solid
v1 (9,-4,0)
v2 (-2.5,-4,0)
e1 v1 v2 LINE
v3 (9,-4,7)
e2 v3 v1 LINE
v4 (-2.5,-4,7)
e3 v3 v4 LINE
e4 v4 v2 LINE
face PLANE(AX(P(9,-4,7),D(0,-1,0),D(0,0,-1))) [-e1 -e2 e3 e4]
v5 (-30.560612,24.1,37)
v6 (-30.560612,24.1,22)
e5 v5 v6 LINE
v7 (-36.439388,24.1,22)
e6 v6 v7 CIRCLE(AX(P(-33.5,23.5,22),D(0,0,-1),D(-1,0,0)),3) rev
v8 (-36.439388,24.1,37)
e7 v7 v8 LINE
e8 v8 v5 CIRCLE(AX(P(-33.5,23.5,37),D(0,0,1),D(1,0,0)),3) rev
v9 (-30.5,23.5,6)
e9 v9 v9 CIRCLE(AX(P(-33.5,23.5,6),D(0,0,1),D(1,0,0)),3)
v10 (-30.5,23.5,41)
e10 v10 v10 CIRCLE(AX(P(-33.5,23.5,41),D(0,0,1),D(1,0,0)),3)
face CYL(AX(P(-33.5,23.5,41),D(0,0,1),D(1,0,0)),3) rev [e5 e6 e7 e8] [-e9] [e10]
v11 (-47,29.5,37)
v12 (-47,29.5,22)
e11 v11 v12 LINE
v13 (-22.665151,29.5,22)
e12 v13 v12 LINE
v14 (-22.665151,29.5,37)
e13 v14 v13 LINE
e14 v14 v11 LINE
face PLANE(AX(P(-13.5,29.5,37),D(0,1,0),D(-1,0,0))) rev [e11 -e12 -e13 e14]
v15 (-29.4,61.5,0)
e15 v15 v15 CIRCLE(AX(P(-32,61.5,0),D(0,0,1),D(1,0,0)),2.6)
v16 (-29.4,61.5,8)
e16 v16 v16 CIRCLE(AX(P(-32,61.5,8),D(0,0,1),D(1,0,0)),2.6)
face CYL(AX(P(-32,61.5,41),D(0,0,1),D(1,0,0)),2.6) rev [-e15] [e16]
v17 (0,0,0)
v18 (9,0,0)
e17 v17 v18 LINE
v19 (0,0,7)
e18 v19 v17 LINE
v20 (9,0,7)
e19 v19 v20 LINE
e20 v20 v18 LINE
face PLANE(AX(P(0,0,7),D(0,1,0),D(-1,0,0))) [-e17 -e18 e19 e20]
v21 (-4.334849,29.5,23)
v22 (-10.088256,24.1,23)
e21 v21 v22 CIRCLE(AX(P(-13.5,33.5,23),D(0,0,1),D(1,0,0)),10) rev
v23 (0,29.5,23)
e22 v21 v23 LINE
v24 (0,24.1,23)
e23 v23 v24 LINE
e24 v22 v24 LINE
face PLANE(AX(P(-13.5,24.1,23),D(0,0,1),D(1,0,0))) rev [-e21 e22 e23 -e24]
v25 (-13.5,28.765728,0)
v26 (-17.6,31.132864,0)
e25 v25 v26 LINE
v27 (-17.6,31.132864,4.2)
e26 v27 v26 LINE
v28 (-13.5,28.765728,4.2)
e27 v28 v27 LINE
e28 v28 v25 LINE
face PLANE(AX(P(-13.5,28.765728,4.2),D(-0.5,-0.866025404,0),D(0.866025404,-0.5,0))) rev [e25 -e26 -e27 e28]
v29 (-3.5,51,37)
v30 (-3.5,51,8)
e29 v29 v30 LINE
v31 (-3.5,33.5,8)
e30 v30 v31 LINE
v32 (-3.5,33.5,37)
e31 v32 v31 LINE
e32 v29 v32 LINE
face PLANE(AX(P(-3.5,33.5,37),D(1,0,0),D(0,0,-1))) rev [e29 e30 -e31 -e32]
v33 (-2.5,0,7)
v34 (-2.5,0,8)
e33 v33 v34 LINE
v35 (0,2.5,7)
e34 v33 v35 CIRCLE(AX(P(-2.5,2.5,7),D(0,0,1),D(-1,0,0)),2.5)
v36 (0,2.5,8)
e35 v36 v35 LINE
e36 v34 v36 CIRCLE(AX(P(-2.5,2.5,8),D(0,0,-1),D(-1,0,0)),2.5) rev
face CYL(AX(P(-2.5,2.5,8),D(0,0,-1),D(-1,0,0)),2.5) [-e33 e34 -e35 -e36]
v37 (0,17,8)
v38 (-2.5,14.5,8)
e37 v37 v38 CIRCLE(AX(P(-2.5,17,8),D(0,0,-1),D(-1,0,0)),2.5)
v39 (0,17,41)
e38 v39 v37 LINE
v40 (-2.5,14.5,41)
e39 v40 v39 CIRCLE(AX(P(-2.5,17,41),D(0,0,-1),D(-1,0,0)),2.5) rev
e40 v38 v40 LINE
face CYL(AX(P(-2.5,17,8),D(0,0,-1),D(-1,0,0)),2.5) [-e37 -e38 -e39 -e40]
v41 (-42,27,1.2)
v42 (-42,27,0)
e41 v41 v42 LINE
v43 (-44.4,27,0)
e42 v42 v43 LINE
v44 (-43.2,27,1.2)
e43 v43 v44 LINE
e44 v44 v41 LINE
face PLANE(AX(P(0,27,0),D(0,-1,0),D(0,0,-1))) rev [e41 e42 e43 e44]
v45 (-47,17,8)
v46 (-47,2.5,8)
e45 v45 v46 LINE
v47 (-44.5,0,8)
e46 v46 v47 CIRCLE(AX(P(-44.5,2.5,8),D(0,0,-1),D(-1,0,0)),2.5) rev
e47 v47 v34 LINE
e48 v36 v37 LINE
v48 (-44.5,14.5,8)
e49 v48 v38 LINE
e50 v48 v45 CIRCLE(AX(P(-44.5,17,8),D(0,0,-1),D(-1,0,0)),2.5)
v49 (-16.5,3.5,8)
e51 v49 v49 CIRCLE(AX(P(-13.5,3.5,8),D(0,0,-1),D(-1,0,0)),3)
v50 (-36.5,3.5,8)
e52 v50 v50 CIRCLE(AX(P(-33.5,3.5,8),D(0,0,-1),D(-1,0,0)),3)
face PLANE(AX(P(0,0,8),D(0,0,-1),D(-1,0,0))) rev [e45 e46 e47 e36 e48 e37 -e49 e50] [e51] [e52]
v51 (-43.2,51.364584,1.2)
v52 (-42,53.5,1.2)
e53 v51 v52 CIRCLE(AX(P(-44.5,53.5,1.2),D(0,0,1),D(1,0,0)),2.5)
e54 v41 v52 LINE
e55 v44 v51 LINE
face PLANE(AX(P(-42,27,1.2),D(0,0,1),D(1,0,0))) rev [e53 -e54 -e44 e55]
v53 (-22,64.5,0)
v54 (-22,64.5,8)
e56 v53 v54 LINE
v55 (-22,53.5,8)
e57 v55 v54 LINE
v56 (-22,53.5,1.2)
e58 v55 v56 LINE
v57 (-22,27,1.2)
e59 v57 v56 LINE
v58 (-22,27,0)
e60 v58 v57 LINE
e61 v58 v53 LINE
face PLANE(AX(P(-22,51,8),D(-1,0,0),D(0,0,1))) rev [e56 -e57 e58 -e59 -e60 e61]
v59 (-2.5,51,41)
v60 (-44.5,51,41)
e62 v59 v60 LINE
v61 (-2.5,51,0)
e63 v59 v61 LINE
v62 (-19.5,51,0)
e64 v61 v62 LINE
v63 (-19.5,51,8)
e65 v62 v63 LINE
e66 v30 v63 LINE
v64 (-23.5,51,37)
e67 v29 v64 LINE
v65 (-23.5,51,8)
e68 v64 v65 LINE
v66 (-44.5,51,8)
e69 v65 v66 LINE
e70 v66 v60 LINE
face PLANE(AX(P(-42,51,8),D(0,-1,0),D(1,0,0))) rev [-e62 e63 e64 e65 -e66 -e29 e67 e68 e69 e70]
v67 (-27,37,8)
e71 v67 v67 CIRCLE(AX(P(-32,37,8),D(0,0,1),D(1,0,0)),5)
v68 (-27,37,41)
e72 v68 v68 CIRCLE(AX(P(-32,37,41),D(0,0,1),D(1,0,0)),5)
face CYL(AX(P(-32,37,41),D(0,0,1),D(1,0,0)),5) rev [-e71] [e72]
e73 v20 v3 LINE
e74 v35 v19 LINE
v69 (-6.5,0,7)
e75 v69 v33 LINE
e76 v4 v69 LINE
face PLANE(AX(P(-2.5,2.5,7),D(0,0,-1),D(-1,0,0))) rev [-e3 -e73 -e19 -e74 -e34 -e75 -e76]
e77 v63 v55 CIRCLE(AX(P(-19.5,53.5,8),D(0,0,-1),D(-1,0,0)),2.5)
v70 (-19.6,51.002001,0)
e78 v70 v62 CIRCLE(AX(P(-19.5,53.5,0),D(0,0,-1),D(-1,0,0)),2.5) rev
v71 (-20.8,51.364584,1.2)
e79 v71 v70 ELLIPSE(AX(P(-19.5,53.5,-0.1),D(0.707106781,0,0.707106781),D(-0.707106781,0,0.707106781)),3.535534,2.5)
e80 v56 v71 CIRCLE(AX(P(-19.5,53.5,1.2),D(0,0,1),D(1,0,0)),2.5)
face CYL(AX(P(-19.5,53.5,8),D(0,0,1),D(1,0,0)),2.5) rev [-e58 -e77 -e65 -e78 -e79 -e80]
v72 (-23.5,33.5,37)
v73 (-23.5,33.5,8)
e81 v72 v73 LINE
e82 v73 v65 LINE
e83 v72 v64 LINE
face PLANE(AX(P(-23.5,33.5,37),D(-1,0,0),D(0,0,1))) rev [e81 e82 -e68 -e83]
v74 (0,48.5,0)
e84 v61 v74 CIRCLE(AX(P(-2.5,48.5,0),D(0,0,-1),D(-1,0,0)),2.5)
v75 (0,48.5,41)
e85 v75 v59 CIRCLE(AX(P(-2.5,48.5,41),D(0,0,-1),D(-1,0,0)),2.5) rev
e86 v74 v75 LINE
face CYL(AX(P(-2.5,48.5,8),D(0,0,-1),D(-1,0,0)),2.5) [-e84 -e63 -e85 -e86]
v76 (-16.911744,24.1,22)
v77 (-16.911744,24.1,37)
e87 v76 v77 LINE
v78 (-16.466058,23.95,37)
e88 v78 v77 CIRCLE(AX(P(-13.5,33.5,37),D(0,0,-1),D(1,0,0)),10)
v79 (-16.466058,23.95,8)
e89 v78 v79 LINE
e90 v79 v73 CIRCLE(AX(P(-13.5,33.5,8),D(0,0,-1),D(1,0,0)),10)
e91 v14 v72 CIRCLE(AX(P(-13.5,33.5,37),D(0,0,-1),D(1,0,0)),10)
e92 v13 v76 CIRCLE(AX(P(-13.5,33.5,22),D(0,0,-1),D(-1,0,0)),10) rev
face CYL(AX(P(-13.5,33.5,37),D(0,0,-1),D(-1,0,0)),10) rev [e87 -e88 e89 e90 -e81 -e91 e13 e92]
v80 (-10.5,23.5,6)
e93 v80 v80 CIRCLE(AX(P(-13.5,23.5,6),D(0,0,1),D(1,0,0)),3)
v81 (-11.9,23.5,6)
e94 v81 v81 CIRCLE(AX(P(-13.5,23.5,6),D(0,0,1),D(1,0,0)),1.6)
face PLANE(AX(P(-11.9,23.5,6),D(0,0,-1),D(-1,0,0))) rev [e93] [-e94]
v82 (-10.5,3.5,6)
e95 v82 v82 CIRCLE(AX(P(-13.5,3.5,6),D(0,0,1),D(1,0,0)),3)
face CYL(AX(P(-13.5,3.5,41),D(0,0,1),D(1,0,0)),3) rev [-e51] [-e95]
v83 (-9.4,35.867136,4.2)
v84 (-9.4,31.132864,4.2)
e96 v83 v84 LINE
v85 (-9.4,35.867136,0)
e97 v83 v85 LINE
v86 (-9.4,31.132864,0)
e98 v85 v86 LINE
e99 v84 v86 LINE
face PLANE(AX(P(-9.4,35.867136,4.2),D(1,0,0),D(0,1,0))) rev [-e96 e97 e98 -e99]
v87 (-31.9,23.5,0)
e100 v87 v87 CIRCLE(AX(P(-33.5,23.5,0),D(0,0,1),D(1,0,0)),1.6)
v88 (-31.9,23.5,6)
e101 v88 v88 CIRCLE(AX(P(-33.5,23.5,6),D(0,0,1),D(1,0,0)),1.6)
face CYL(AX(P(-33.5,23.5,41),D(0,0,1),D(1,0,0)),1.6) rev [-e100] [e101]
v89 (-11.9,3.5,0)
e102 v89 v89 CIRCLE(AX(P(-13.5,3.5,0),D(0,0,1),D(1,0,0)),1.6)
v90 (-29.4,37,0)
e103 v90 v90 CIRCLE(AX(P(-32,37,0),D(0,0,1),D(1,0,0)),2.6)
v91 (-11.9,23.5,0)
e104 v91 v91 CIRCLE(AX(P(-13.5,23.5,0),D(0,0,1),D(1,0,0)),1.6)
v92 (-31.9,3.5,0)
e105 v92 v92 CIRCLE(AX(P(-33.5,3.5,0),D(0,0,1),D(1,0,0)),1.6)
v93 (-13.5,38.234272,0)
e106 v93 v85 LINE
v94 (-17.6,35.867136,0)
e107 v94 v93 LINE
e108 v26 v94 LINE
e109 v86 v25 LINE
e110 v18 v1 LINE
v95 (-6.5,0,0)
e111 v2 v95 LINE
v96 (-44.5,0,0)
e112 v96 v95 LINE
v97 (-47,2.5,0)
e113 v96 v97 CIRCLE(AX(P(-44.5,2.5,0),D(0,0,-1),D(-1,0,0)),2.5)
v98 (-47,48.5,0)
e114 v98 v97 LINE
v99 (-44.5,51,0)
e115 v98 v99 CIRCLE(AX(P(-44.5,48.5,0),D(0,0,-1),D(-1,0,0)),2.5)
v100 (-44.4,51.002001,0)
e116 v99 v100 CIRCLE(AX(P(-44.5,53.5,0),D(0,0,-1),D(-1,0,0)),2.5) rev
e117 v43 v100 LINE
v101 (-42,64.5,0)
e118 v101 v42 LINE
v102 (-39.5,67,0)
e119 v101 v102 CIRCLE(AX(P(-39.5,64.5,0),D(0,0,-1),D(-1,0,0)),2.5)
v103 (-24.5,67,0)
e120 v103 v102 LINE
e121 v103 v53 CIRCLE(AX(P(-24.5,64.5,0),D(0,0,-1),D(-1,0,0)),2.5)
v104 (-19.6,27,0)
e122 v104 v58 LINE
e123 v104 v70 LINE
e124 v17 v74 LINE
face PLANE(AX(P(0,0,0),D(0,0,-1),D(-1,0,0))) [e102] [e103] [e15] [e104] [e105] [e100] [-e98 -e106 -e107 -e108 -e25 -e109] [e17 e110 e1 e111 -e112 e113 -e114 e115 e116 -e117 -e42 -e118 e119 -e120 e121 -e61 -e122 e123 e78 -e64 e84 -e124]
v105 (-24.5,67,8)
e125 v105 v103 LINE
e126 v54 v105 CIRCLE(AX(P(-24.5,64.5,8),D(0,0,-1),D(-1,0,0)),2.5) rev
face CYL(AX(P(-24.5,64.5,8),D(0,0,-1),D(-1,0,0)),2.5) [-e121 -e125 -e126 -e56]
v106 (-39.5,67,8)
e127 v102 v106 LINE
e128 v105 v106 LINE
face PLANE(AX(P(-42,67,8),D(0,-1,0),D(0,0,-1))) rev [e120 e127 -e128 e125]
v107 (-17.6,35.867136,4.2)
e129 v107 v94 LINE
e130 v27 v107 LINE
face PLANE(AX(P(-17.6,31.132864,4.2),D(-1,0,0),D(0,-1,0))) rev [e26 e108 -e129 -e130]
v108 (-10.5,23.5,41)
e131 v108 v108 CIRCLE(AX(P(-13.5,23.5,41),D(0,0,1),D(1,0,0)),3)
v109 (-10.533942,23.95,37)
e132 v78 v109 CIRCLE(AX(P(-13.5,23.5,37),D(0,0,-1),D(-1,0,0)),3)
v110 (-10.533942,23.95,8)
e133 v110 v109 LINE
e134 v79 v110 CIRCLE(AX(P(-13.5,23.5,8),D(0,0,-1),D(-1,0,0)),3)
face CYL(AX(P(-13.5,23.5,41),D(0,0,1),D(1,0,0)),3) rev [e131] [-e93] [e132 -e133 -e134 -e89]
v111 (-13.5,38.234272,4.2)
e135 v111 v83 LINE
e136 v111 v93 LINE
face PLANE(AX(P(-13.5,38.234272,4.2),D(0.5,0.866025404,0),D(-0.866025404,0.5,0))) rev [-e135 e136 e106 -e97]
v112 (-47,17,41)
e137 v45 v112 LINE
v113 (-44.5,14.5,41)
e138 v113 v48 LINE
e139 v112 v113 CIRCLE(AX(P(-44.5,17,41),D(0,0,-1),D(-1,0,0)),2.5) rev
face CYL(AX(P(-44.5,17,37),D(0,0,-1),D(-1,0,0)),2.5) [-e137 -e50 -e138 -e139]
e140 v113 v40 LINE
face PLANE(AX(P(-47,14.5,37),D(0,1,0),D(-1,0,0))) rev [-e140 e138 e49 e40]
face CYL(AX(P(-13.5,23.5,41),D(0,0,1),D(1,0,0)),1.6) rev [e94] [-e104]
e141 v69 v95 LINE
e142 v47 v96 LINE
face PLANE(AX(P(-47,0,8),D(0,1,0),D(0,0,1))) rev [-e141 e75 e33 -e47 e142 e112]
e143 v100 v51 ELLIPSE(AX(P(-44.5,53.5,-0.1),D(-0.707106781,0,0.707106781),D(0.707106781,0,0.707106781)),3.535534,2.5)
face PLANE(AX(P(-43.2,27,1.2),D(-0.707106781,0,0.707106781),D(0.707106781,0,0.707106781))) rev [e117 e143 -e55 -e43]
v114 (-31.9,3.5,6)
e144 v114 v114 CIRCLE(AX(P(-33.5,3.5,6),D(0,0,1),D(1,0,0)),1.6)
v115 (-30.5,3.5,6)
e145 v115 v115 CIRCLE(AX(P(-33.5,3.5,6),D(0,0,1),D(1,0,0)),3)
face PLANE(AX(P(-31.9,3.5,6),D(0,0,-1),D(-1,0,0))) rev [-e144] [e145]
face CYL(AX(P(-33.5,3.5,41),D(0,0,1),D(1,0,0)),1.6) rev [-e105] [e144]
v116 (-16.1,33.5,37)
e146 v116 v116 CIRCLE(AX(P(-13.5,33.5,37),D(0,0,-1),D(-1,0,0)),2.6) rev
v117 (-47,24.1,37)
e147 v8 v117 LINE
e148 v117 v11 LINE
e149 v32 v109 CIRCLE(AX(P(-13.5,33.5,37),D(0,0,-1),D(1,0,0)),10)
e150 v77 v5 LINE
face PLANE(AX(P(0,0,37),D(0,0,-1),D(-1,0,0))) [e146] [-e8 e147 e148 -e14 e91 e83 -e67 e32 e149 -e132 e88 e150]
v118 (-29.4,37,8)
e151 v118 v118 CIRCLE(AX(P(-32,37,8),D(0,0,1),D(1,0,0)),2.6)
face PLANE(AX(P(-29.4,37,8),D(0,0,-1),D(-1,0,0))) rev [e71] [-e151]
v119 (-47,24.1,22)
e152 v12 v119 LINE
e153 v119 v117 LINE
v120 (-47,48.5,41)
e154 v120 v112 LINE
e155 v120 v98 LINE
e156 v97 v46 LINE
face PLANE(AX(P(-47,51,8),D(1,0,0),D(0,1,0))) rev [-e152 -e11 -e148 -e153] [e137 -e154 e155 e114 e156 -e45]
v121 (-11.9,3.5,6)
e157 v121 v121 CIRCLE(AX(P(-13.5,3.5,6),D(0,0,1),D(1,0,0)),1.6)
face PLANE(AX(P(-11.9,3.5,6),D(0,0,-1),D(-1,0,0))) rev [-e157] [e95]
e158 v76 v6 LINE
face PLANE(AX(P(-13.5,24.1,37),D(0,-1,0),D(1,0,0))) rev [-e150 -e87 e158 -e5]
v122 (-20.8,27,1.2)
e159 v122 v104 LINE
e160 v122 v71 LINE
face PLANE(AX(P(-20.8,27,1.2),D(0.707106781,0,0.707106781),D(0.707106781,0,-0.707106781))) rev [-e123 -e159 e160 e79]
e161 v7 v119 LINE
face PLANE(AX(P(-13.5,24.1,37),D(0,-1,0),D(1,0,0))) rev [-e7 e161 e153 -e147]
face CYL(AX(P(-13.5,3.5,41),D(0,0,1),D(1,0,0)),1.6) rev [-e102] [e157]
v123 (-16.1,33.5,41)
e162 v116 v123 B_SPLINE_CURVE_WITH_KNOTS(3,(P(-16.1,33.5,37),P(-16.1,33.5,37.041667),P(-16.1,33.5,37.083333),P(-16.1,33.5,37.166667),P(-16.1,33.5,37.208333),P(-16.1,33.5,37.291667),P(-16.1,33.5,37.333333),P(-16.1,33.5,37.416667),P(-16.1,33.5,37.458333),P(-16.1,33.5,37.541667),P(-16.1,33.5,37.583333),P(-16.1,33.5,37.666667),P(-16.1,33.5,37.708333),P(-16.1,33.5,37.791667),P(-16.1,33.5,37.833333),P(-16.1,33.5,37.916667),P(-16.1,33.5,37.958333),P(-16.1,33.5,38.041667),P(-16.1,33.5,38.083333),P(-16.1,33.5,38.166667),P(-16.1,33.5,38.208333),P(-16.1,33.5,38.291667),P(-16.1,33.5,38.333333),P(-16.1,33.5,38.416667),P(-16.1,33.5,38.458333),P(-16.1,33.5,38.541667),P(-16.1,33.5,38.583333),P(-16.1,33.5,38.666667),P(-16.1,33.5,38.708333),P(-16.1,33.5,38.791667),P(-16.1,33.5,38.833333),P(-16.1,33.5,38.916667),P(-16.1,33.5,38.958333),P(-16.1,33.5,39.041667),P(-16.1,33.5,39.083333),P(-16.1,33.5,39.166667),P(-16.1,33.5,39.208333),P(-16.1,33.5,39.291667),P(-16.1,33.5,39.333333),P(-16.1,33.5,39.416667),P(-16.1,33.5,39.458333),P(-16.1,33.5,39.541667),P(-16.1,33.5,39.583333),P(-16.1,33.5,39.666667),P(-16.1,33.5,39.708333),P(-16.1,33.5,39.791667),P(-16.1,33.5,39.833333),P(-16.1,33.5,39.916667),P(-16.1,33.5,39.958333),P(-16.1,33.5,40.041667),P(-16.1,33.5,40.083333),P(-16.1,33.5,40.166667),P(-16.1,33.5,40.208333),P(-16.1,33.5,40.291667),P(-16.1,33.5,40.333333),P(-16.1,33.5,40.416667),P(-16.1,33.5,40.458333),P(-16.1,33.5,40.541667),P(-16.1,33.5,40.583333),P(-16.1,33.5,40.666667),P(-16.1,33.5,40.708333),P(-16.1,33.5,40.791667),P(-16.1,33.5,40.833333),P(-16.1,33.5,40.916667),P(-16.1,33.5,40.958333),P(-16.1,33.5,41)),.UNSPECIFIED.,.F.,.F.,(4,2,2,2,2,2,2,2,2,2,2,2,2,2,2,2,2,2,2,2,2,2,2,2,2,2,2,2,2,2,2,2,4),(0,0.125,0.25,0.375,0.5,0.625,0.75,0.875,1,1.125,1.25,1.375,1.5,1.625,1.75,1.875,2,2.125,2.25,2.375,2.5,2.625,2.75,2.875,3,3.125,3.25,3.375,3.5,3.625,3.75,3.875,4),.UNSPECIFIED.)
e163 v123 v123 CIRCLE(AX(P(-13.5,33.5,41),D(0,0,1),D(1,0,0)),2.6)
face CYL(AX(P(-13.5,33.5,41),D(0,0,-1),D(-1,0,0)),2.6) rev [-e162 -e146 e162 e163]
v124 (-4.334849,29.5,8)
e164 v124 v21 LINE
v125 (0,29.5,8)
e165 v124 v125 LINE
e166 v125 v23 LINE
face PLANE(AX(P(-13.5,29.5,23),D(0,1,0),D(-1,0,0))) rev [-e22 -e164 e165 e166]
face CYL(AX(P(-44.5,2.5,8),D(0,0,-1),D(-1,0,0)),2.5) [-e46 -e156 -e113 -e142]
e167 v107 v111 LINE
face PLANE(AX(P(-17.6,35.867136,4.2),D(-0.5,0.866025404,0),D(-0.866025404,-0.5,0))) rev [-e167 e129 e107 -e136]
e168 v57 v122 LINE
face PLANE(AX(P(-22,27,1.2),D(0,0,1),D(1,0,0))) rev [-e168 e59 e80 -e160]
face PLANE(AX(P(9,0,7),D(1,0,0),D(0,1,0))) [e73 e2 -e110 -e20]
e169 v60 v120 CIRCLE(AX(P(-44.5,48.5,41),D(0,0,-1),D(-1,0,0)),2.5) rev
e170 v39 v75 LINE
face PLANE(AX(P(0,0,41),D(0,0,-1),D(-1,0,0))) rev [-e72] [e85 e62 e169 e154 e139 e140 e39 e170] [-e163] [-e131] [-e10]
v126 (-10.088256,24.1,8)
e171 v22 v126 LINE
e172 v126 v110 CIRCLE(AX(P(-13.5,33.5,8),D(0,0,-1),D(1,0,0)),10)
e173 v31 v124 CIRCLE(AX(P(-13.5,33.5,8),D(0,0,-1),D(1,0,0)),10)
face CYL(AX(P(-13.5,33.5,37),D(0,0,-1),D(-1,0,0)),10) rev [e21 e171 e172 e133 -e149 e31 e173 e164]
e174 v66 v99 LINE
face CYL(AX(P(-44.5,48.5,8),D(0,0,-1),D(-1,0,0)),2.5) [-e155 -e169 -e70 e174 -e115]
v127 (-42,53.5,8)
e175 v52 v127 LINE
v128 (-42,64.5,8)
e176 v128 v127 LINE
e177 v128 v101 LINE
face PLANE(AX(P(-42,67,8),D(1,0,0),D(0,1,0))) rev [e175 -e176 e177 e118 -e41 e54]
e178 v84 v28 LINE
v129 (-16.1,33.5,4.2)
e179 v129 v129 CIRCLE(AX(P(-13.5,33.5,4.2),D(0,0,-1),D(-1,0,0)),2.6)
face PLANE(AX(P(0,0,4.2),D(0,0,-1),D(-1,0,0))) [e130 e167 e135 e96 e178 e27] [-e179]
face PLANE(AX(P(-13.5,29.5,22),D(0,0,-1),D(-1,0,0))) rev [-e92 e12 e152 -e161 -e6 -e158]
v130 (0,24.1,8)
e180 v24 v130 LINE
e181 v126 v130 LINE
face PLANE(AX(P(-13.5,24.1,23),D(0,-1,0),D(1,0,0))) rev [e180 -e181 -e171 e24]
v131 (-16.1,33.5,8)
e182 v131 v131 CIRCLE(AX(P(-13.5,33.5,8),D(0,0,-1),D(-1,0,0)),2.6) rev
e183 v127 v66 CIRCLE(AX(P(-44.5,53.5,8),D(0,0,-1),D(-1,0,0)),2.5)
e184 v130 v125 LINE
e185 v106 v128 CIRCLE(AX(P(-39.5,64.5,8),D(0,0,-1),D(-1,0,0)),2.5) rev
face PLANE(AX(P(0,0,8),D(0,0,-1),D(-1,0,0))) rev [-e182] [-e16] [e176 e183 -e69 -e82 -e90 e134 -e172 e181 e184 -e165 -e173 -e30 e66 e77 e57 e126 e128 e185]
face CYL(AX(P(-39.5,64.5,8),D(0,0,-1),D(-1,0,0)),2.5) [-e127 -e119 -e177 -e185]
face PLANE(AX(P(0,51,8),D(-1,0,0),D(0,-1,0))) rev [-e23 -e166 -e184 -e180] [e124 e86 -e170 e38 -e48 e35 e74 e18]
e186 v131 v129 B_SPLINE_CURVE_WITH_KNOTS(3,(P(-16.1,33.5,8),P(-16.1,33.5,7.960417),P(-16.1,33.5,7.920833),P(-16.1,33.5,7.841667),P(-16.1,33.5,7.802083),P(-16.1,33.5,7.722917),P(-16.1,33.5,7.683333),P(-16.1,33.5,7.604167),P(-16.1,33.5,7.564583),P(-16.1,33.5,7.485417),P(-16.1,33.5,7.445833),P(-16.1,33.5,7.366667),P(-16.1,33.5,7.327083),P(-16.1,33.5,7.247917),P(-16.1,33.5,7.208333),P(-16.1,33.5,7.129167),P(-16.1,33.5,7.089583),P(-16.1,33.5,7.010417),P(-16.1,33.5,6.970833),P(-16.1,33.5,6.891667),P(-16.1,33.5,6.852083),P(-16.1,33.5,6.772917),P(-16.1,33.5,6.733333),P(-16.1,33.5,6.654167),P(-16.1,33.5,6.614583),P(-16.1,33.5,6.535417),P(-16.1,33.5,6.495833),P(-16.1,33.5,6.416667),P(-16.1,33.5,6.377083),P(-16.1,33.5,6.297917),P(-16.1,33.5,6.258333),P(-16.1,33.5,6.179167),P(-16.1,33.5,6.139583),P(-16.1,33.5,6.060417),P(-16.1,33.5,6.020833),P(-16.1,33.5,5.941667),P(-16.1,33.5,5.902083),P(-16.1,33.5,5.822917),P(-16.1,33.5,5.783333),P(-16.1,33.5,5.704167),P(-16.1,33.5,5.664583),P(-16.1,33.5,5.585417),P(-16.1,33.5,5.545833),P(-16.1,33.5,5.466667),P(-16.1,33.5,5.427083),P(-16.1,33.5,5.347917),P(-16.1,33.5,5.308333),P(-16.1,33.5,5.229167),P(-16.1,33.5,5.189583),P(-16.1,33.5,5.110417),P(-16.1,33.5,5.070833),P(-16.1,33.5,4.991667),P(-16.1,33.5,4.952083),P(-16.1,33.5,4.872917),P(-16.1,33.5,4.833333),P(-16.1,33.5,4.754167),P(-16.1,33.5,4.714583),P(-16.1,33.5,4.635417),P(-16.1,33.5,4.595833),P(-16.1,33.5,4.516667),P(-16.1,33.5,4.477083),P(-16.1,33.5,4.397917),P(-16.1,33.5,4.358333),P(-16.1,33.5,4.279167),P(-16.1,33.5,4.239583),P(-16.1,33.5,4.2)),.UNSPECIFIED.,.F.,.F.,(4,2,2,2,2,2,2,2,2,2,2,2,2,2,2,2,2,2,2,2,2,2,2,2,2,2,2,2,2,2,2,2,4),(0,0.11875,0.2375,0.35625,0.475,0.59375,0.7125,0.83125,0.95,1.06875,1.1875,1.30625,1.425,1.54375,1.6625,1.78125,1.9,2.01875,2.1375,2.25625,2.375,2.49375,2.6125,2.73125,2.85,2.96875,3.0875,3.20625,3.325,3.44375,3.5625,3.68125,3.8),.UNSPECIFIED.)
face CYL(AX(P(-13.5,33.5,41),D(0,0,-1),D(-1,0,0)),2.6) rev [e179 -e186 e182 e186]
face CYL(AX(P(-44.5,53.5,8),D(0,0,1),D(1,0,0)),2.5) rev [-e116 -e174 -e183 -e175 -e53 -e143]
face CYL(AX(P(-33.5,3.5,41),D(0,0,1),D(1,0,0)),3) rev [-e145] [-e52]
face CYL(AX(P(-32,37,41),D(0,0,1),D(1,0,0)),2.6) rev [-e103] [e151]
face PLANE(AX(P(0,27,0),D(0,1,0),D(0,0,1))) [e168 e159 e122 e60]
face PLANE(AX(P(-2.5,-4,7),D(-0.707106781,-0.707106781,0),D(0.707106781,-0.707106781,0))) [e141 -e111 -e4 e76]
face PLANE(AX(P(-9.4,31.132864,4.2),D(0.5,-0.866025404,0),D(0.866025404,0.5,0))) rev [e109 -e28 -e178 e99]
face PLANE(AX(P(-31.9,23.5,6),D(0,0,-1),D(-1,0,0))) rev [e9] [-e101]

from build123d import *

# Parameters (mm, degrees)
EXTRUDE_1_DEPTH             = 8
EXTRUDE_9_DEPTH             = 29
SKETCH_25_W                 = 47
SKETCH_25_H                 = 36.5
EXTRUDE_10_DEPTH            = 4
HOLE_WIZARD_M51_D           = 3.2
HOLE_WIZARD_M51_CBORE_D     = 6
HOLE_WIZARD_M51_CBORE_DEPTH = 35
SKETCH_22_R                 = 2.6
CUT_EXTRUDE_9_DEPTH         = 92.536877814
CUT_EXTRUDE_10_DEPTH        = 4.2
HOLE_WIZARD_M52_D           = 5.2
HOLE_WIZARD_M52_CBORE_D     = 10
HOLE_WIZARD_M52_CBORE_DEPTH = 33
CUT_EXTRUDE_11_DEPTH        = 24
FILLET_1_R                  = 2.5
EXTRUDE_11_DEPTH            = 7
SKETCH_32_W                 = 15
SKETCH_32_H                 = 5.4
CUT_EXTRUDE_12_DEPTH        = 13.5
SKETCH_33_W                 = 15
SKETCH_33_H                 = 5.4
CUT_EXTRUDE_13_DEPTH        = 33.5


with BuildPart() as part:
    # Эскиз1 → Бобышка-Вытянуть1 (new body)
    with BuildSketch(Plane.XY):
        Polygon((-47, 51), (-47, 0), (0, 0), (0, 51), (-22, 51), (-22, 67), (-42, 67), (-42, 51), align=None)
    extrude(amount=EXTRUDE_1_DEPTH)

    # Эскиз24 → Бобышка-Вытянуть9 (add)
    with BuildSketch(Plane.XY.offset(8)):
        with BuildLine():
            Line((0, 51), (-3.5, 51))
            Line((-3.5, 51), (-3.5, 33.5))
            ThreePointArc((-3.5, 33.5), (-13.5, 23.5), (-23.5, 33.5))
            Line((-23.5, 33.5), (-23.5, 51))
            Line((-23.5, 51), (-47, 51))
            Line((-47, 51), (-47, 14.5))
            Line((-47, 14.5), (0, 14.5))
            Line((0, 14.5), (0, 51))
        make_face()
    extrude(amount=EXTRUDE_9_DEPTH)

    # Эскиз25 → Бобышка-Вытянуть10 (add)
    with BuildSketch(Plane.XY.offset(37)):
        with Locations((-23.5, 32.75)):
            Rectangle(SKETCH_25_W, SKETCH_25_H)
    extrude(amount=EXTRUDE_10_DEPTH)

    # Цековка для  болта с шестигранной головкой M51 (through all)
    with Locations(Plane(origin=(-33.5, 3.5, 41), x_dir=(1, 0, 0), z_dir=(0, 0, 1))):
        with Locations((0, 0), (0, 20), (20, 0), (20, 20)):
            CounterBoreHole(HOLE_WIZARD_M51_D / 2, HOLE_WIZARD_M51_CBORE_D / 2, HOLE_WIZARD_M51_CBORE_DEPTH)

    # Эскиз22 → Вырез-Вытянуть9 (cut, through all)
    with BuildSketch(Plane.XY):
        with Locations(Location((-13.5, 33.5, 0), (0, 0, 180))):
            Circle(SKETCH_22_R)
    extrude(amount=CUT_EXTRUDE_9_DEPTH, mode=Mode.SUBTRACT)

    # Эскиз23 → Вырез-Вытянуть10 (cut)
    with BuildSketch(Plane(origin=(0, 0, 0), x_dir=(-1, 0, 0), z_dir=(0, 0, -1))):
        Polygon((13.5, 38.234272207), (9.4, 35.867136104), (9.4, 31.132863896), (13.5, 28.765727793), (17.6, 31.132863896), (17.6, 35.867136104), align=None)
    extrude(amount=-CUT_EXTRUDE_10_DEPTH, mode=Mode.SUBTRACT)

    # Цековка для  болта с шестигранной головкой M52 (through all)
    with Locations(Plane(origin=(-32, 61.5, 41), x_dir=(1, 0, 0), z_dir=(0, 0, 1))):
        with Locations((0, 0), (0, -24.5)):
            CounterBoreHole(HOLE_WIZARD_M52_D / 2, HOLE_WIZARD_M52_CBORE_D / 2, HOLE_WIZARD_M52_CBORE_DEPTH)

    # Эскиз30 → Вырез-Вытянуть11 (cut)
    with BuildSketch(Plane(origin=(0, 51, 0), x_dir=(1, 0, 0), z_dir=(0, 1, 0))):
        Polygon((-42, 0), (-42, -1.2), (-43.2, -1.2), (-44.4, 0), align=None)
        Polygon((-22, 0), (-22, -1.2), (-20.8, -1.2), (-19.6, 0), align=None)
    extrude(amount=-CUT_EXTRUDE_11_DEPTH, mode=Mode.SUBTRACT)

    # Скругление1
    # the kernel refuses this fillet: 2.5 mm, written as the material it adds along each edge
    with BuildSketch(Plane(origin=(-22, 51, -5.05), x_dir=(0, 1, 0), z_dir=(0, 0, 1))) as fillet_1_piece_1_section:
        with BuildLine():
            CenterArc((FILLET_1_R, -FILLET_1_R), FILLET_1_R, 90, 90)
            Line((0, -FILLET_1_R), (0, 0))
            Line((0, 0), (FILLET_1_R, 0))
        make_face()
    fillet_1_piece_1 = extrude(amount=13.05, mode=Mode.PRIVATE)
    fillet_1_piece_1 = split(fillet_1_piece_1, bisect_by=Plane(origin=(-20.123471849, 51.026696565, 0), z_dir=(0, 0, 1)), keep=Keep.TOP, mode=Mode.PRIVATE)
    fillet_1_piece_1 = split(fillet_1_piece_1, bisect_by=Plane(origin=(-20.123471849, 51.026696565, 1.2), z_dir=(0, 0, -1)), keep=Keep.TOP, mode=Mode.PRIVATE)
    fillet_1_piece_1 = split(fillet_1_piece_1, bisect_by=Plane(origin=(-20.293433634, 51.026696565, 0.693433634), z_dir=(0.7071067811865498, 0, 0.7071067811865455)), keep=Keep.TOP, mode=Mode.PRIVATE)
    add(fillet_1_piece_1)
    with BuildSketch(Plane(origin=(-22, 51, 1.2), x_dir=(0, 1, 0), z_dir=(0, 0, 1))) as fillet_1_piece_2_section:
        with BuildLine():
            CenterArc((FILLET_1_R, -FILLET_1_R), FILLET_1_R, 90, 90)
            Line((0, -FILLET_1_R), (0, 0))
            Line((0, 0), (FILLET_1_R, 0))
        make_face()
    fillet_1_piece_2 = extrude(amount=6.8, mode=Mode.PRIVATE)
    fillet_1_piece_2 = split(fillet_1_piece_2, bisect_by=Plane(origin=(-21.509165304, 51.769559816, 1.909165304), z_dir=(-0.7071067811865498, 0, -0.7071067811865455)), keep=Keep.TOP, mode=Mode.PRIVATE)
    add(fillet_1_piece_2)
    with BuildSketch(Plane(origin=(-22, 51, 1.2), x_dir=(0, 1, 0), z_dir=(0, 0, 1))) as fillet_1_piece_3_section:
        with BuildLine():
            CenterArc((FILLET_1_R, -FILLET_1_R), FILLET_1_R, 90, 90)
            Line((0, -FILLET_1_R), (0, 0))
            Line((0, 0), (FILLET_1_R, 0))
        make_face()
    fillet_1_piece_3 = extrude(amount=6.8, mode=Mode.PRIVATE)
    fillet_1_piece_3 = split(fillet_1_piece_3, bisect_by=Plane(origin=(-22.965000899, 51.542951648, 3.365000899), z_dir=(0.7071067811865498, 0, 0.7071067811865455)), keep=Keep.TOP, mode=Mode.PRIVATE)
    add(fillet_1_piece_3)
    with BuildSketch(Plane(origin=(-42, 51, -5.05), x_dir=(0, 1, 0), z_dir=(0, 0, 1))) as fillet_1_piece_4_section:
        with BuildLine():
            CenterArc((FILLET_1_R, FILLET_1_R), FILLET_1_R, 180, 90)
            Line((0, FILLET_1_R), (0, 0))
            Line((0, 0), (FILLET_1_R, 0))
        make_face()
    fillet_1_piece_4 = extrude(amount=13.05, mode=Mode.PRIVATE)
    fillet_1_piece_4 = split(fillet_1_piece_4, bisect_by=Plane(origin=(-43.876528151, 51.026696565, 0), z_dir=(0, 0, 1)), keep=Keep.TOP, mode=Mode.PRIVATE)
    fillet_1_piece_4 = split(fillet_1_piece_4, bisect_by=Plane(origin=(-43.706566366, 51.026696565, 0.693433634), z_dir=(-0.7071067811865488, 0, 0.7071067811865464)), keep=Keep.TOP, mode=Mode.PRIVATE)
    fillet_1_piece_4 = split(fillet_1_piece_4, bisect_by=Plane(origin=(-43.876528151, 51.026696565, 1.2), z_dir=(0, 0, -1)), keep=Keep.TOP, mode=Mode.PRIVATE)
    add(fillet_1_piece_4)
    with BuildSketch(Plane(origin=(-42, 51, 1.2), x_dir=(0, 1, 0), z_dir=(0, 0, 1))) as fillet_1_piece_5_section:
        with BuildLine():
            CenterArc((FILLET_1_R, FILLET_1_R), FILLET_1_R, 180, 90)
            Line((0, FILLET_1_R), (0, 0))
            Line((0, 0), (FILLET_1_R, 0))
        make_face()
    fillet_1_piece_5 = extrude(amount=6.8, mode=Mode.PRIVATE)
    fillet_1_piece_5 = split(fillet_1_piece_5, bisect_by=Plane(origin=(-42.490834696, 51.769559816, 1.909165304), z_dir=(0.7071067811865488, 0, -0.7071067811865464)), keep=Keep.TOP, mode=Mode.PRIVATE)
    add(fillet_1_piece_5)
    with BuildSketch(Plane(origin=(-42, 51, 1.2), x_dir=(0, 1, 0), z_dir=(0, 0, 1))) as fillet_1_piece_6_section:
        with BuildLine():
            CenterArc((FILLET_1_R, FILLET_1_R), FILLET_1_R, 180, 90)
            Line((0, FILLET_1_R), (0, 0))
            Line((0, 0), (FILLET_1_R, 0))
        make_face()
    fillet_1_piece_6 = extrude(amount=6.8, mode=Mode.PRIVATE)
    fillet_1_piece_6 = split(fillet_1_piece_6, bisect_by=Plane(origin=(-41.034999101, 51.542951648, 3.365000899), z_dir=(-0.7071067811865488, 0, 0.7071067811865464)), keep=Keep.TOP, mode=Mode.PRIVATE)
    add(fillet_1_piece_6)
    # the kernel refuses this fillet: 2.5 mm, written as the material it takes off along each edge
    with BuildSketch(Plane(origin=(-47, 0, -6.25), x_dir=(0, 1, 0), z_dir=(0, 0, 1))) as fillet_1_2_piece_1:
        with BuildLine():
            CenterArc((FILLET_1_R, -FILLET_1_R), FILLET_1_R, 90, 90)
            Line((0, -FILLET_1_R), (0, 0))
            Line((0, 0), (FILLET_1_R, 0))
        make_face()
    extrude(amount=20.5, mode=Mode.SUBTRACT)
    with BuildSketch(Plane(origin=(-22, 67, -6.25), x_dir=(-1, 0, 0), z_dir=(0, 0, 1)), Plane(origin=(0, 0, -6.25), x_dir=(0, 1, 0), z_dir=(0, 0, 1)), Plane(origin=(-42, 67, -6.25), x_dir=(0, -1, 0), z_dir=(0, 0, 1))) as fillet_1_2_piece_2:
        with BuildLine():
            CenterArc((FILLET_1_R, FILLET_1_R), FILLET_1_R, 180, 90)
            Line((0, FILLET_1_R), (0, 0))
            Line((0, 0), (FILLET_1_R, 0))
        make_face()
    extrude(amount=20.5, mode=Mode.SUBTRACT)
    with BuildSketch(Plane(origin=(0, 51, 47.25), x_dir=(0, -1, 0), z_dir=(0, 0, -1))) as fillet_1_2_piece_3:
        with BuildLine():
            CenterArc((FILLET_1_R, FILLET_1_R), FILLET_1_R, 180, 90)
            Line((0, FILLET_1_R), (0, 0))
            Line((0, 0), (FILLET_1_R, 0))
        make_face()
    extrude(amount=53.5, mode=Mode.SUBTRACT)
    with BuildSketch(Plane(origin=(-47, 51, 47.25), x_dir=(0, -1, 0), z_dir=(0, 0, -1))) as fillet_1_2_piece_4:
        with BuildLine():
            CenterArc((FILLET_1_R, -FILLET_1_R), FILLET_1_R, 90, 90)
            Line((0, -FILLET_1_R), (0, 0))
            Line((0, 0), (FILLET_1_R, 0))
        make_face()
    extrude(amount=53.5, mode=Mode.SUBTRACT)
    with BuildSketch(Plane(origin=(-47, 14.5, 8), x_dir=(0, 1, 0), z_dir=(0, 0, 1))) as fillet_1_2_piece_5:
        with BuildLine():
            CenterArc((FILLET_1_R, -FILLET_1_R), FILLET_1_R, 90, 90)
            Line((0, -FILLET_1_R), (0, 0))
            Line((0, 0), (FILLET_1_R, 0))
        make_face()
    extrude(amount=39.25, mode=Mode.SUBTRACT)
    with BuildSketch(Plane(origin=(0, 14.5, 8), x_dir=(0, 1, 0), z_dir=(0, 0, 1))) as fillet_1_2_piece_6:
        with BuildLine():
            CenterArc((FILLET_1_R, FILLET_1_R), FILLET_1_R, 180, 90)
            Line((0, FILLET_1_R), (0, 0))
            Line((0, 0), (FILLET_1_R, 0))
        make_face()
    extrude(amount=39.25, mode=Mode.SUBTRACT)

    # Эскиз31 → Бобышка-Вытянуть11 (add)
    with BuildSketch(Plane(origin=(0, 0, 0), x_dir=(-1, 0, 0), z_dir=(0, 0, -1))):
        with BuildLine():
            Line((0, 0), (-9, 0))
            Line((-9, 0), (-9, -4))
            Line((-9, -4), (2.5, -4))
            Line((2.5, -4), (6.5, 0))
            Line((6.5, 0), (2.5, 0))
            ThreePointArc((2.5, 0), (0.732233047, 0.732233047), (0, 2.5))
            Line((0, 2.5), (0, 0))
        make_face()
    extrude(amount=-EXTRUDE_11_DEPTH)

    # Эскиз32 → Вырез-Вытянуть12 (cut)
    with BuildSketch(Plane(origin=(0, 0, 0), x_dir=(0, 0, -1), z_dir=(1, 0, 0))):
        with Locations((-15.5, 26.8)):
            Rectangle(SKETCH_32_W, SKETCH_32_H)
    extrude(amount=-CUT_EXTRUDE_12_DEPTH, mode=Mode.SUBTRACT)

    # Эскиз33 → Вырез-Вытянуть13 (cut)
    with BuildSketch(Plane.ZY.offset(47)):
        with Locations((29.5, 26.8)):
            Rectangle(SKETCH_33_W, SKETCH_33_H)
    extrude(amount=-CUT_EXTRUDE_13_DEPTH, mode=Mode.SUBTRACT)


solid = part.part
